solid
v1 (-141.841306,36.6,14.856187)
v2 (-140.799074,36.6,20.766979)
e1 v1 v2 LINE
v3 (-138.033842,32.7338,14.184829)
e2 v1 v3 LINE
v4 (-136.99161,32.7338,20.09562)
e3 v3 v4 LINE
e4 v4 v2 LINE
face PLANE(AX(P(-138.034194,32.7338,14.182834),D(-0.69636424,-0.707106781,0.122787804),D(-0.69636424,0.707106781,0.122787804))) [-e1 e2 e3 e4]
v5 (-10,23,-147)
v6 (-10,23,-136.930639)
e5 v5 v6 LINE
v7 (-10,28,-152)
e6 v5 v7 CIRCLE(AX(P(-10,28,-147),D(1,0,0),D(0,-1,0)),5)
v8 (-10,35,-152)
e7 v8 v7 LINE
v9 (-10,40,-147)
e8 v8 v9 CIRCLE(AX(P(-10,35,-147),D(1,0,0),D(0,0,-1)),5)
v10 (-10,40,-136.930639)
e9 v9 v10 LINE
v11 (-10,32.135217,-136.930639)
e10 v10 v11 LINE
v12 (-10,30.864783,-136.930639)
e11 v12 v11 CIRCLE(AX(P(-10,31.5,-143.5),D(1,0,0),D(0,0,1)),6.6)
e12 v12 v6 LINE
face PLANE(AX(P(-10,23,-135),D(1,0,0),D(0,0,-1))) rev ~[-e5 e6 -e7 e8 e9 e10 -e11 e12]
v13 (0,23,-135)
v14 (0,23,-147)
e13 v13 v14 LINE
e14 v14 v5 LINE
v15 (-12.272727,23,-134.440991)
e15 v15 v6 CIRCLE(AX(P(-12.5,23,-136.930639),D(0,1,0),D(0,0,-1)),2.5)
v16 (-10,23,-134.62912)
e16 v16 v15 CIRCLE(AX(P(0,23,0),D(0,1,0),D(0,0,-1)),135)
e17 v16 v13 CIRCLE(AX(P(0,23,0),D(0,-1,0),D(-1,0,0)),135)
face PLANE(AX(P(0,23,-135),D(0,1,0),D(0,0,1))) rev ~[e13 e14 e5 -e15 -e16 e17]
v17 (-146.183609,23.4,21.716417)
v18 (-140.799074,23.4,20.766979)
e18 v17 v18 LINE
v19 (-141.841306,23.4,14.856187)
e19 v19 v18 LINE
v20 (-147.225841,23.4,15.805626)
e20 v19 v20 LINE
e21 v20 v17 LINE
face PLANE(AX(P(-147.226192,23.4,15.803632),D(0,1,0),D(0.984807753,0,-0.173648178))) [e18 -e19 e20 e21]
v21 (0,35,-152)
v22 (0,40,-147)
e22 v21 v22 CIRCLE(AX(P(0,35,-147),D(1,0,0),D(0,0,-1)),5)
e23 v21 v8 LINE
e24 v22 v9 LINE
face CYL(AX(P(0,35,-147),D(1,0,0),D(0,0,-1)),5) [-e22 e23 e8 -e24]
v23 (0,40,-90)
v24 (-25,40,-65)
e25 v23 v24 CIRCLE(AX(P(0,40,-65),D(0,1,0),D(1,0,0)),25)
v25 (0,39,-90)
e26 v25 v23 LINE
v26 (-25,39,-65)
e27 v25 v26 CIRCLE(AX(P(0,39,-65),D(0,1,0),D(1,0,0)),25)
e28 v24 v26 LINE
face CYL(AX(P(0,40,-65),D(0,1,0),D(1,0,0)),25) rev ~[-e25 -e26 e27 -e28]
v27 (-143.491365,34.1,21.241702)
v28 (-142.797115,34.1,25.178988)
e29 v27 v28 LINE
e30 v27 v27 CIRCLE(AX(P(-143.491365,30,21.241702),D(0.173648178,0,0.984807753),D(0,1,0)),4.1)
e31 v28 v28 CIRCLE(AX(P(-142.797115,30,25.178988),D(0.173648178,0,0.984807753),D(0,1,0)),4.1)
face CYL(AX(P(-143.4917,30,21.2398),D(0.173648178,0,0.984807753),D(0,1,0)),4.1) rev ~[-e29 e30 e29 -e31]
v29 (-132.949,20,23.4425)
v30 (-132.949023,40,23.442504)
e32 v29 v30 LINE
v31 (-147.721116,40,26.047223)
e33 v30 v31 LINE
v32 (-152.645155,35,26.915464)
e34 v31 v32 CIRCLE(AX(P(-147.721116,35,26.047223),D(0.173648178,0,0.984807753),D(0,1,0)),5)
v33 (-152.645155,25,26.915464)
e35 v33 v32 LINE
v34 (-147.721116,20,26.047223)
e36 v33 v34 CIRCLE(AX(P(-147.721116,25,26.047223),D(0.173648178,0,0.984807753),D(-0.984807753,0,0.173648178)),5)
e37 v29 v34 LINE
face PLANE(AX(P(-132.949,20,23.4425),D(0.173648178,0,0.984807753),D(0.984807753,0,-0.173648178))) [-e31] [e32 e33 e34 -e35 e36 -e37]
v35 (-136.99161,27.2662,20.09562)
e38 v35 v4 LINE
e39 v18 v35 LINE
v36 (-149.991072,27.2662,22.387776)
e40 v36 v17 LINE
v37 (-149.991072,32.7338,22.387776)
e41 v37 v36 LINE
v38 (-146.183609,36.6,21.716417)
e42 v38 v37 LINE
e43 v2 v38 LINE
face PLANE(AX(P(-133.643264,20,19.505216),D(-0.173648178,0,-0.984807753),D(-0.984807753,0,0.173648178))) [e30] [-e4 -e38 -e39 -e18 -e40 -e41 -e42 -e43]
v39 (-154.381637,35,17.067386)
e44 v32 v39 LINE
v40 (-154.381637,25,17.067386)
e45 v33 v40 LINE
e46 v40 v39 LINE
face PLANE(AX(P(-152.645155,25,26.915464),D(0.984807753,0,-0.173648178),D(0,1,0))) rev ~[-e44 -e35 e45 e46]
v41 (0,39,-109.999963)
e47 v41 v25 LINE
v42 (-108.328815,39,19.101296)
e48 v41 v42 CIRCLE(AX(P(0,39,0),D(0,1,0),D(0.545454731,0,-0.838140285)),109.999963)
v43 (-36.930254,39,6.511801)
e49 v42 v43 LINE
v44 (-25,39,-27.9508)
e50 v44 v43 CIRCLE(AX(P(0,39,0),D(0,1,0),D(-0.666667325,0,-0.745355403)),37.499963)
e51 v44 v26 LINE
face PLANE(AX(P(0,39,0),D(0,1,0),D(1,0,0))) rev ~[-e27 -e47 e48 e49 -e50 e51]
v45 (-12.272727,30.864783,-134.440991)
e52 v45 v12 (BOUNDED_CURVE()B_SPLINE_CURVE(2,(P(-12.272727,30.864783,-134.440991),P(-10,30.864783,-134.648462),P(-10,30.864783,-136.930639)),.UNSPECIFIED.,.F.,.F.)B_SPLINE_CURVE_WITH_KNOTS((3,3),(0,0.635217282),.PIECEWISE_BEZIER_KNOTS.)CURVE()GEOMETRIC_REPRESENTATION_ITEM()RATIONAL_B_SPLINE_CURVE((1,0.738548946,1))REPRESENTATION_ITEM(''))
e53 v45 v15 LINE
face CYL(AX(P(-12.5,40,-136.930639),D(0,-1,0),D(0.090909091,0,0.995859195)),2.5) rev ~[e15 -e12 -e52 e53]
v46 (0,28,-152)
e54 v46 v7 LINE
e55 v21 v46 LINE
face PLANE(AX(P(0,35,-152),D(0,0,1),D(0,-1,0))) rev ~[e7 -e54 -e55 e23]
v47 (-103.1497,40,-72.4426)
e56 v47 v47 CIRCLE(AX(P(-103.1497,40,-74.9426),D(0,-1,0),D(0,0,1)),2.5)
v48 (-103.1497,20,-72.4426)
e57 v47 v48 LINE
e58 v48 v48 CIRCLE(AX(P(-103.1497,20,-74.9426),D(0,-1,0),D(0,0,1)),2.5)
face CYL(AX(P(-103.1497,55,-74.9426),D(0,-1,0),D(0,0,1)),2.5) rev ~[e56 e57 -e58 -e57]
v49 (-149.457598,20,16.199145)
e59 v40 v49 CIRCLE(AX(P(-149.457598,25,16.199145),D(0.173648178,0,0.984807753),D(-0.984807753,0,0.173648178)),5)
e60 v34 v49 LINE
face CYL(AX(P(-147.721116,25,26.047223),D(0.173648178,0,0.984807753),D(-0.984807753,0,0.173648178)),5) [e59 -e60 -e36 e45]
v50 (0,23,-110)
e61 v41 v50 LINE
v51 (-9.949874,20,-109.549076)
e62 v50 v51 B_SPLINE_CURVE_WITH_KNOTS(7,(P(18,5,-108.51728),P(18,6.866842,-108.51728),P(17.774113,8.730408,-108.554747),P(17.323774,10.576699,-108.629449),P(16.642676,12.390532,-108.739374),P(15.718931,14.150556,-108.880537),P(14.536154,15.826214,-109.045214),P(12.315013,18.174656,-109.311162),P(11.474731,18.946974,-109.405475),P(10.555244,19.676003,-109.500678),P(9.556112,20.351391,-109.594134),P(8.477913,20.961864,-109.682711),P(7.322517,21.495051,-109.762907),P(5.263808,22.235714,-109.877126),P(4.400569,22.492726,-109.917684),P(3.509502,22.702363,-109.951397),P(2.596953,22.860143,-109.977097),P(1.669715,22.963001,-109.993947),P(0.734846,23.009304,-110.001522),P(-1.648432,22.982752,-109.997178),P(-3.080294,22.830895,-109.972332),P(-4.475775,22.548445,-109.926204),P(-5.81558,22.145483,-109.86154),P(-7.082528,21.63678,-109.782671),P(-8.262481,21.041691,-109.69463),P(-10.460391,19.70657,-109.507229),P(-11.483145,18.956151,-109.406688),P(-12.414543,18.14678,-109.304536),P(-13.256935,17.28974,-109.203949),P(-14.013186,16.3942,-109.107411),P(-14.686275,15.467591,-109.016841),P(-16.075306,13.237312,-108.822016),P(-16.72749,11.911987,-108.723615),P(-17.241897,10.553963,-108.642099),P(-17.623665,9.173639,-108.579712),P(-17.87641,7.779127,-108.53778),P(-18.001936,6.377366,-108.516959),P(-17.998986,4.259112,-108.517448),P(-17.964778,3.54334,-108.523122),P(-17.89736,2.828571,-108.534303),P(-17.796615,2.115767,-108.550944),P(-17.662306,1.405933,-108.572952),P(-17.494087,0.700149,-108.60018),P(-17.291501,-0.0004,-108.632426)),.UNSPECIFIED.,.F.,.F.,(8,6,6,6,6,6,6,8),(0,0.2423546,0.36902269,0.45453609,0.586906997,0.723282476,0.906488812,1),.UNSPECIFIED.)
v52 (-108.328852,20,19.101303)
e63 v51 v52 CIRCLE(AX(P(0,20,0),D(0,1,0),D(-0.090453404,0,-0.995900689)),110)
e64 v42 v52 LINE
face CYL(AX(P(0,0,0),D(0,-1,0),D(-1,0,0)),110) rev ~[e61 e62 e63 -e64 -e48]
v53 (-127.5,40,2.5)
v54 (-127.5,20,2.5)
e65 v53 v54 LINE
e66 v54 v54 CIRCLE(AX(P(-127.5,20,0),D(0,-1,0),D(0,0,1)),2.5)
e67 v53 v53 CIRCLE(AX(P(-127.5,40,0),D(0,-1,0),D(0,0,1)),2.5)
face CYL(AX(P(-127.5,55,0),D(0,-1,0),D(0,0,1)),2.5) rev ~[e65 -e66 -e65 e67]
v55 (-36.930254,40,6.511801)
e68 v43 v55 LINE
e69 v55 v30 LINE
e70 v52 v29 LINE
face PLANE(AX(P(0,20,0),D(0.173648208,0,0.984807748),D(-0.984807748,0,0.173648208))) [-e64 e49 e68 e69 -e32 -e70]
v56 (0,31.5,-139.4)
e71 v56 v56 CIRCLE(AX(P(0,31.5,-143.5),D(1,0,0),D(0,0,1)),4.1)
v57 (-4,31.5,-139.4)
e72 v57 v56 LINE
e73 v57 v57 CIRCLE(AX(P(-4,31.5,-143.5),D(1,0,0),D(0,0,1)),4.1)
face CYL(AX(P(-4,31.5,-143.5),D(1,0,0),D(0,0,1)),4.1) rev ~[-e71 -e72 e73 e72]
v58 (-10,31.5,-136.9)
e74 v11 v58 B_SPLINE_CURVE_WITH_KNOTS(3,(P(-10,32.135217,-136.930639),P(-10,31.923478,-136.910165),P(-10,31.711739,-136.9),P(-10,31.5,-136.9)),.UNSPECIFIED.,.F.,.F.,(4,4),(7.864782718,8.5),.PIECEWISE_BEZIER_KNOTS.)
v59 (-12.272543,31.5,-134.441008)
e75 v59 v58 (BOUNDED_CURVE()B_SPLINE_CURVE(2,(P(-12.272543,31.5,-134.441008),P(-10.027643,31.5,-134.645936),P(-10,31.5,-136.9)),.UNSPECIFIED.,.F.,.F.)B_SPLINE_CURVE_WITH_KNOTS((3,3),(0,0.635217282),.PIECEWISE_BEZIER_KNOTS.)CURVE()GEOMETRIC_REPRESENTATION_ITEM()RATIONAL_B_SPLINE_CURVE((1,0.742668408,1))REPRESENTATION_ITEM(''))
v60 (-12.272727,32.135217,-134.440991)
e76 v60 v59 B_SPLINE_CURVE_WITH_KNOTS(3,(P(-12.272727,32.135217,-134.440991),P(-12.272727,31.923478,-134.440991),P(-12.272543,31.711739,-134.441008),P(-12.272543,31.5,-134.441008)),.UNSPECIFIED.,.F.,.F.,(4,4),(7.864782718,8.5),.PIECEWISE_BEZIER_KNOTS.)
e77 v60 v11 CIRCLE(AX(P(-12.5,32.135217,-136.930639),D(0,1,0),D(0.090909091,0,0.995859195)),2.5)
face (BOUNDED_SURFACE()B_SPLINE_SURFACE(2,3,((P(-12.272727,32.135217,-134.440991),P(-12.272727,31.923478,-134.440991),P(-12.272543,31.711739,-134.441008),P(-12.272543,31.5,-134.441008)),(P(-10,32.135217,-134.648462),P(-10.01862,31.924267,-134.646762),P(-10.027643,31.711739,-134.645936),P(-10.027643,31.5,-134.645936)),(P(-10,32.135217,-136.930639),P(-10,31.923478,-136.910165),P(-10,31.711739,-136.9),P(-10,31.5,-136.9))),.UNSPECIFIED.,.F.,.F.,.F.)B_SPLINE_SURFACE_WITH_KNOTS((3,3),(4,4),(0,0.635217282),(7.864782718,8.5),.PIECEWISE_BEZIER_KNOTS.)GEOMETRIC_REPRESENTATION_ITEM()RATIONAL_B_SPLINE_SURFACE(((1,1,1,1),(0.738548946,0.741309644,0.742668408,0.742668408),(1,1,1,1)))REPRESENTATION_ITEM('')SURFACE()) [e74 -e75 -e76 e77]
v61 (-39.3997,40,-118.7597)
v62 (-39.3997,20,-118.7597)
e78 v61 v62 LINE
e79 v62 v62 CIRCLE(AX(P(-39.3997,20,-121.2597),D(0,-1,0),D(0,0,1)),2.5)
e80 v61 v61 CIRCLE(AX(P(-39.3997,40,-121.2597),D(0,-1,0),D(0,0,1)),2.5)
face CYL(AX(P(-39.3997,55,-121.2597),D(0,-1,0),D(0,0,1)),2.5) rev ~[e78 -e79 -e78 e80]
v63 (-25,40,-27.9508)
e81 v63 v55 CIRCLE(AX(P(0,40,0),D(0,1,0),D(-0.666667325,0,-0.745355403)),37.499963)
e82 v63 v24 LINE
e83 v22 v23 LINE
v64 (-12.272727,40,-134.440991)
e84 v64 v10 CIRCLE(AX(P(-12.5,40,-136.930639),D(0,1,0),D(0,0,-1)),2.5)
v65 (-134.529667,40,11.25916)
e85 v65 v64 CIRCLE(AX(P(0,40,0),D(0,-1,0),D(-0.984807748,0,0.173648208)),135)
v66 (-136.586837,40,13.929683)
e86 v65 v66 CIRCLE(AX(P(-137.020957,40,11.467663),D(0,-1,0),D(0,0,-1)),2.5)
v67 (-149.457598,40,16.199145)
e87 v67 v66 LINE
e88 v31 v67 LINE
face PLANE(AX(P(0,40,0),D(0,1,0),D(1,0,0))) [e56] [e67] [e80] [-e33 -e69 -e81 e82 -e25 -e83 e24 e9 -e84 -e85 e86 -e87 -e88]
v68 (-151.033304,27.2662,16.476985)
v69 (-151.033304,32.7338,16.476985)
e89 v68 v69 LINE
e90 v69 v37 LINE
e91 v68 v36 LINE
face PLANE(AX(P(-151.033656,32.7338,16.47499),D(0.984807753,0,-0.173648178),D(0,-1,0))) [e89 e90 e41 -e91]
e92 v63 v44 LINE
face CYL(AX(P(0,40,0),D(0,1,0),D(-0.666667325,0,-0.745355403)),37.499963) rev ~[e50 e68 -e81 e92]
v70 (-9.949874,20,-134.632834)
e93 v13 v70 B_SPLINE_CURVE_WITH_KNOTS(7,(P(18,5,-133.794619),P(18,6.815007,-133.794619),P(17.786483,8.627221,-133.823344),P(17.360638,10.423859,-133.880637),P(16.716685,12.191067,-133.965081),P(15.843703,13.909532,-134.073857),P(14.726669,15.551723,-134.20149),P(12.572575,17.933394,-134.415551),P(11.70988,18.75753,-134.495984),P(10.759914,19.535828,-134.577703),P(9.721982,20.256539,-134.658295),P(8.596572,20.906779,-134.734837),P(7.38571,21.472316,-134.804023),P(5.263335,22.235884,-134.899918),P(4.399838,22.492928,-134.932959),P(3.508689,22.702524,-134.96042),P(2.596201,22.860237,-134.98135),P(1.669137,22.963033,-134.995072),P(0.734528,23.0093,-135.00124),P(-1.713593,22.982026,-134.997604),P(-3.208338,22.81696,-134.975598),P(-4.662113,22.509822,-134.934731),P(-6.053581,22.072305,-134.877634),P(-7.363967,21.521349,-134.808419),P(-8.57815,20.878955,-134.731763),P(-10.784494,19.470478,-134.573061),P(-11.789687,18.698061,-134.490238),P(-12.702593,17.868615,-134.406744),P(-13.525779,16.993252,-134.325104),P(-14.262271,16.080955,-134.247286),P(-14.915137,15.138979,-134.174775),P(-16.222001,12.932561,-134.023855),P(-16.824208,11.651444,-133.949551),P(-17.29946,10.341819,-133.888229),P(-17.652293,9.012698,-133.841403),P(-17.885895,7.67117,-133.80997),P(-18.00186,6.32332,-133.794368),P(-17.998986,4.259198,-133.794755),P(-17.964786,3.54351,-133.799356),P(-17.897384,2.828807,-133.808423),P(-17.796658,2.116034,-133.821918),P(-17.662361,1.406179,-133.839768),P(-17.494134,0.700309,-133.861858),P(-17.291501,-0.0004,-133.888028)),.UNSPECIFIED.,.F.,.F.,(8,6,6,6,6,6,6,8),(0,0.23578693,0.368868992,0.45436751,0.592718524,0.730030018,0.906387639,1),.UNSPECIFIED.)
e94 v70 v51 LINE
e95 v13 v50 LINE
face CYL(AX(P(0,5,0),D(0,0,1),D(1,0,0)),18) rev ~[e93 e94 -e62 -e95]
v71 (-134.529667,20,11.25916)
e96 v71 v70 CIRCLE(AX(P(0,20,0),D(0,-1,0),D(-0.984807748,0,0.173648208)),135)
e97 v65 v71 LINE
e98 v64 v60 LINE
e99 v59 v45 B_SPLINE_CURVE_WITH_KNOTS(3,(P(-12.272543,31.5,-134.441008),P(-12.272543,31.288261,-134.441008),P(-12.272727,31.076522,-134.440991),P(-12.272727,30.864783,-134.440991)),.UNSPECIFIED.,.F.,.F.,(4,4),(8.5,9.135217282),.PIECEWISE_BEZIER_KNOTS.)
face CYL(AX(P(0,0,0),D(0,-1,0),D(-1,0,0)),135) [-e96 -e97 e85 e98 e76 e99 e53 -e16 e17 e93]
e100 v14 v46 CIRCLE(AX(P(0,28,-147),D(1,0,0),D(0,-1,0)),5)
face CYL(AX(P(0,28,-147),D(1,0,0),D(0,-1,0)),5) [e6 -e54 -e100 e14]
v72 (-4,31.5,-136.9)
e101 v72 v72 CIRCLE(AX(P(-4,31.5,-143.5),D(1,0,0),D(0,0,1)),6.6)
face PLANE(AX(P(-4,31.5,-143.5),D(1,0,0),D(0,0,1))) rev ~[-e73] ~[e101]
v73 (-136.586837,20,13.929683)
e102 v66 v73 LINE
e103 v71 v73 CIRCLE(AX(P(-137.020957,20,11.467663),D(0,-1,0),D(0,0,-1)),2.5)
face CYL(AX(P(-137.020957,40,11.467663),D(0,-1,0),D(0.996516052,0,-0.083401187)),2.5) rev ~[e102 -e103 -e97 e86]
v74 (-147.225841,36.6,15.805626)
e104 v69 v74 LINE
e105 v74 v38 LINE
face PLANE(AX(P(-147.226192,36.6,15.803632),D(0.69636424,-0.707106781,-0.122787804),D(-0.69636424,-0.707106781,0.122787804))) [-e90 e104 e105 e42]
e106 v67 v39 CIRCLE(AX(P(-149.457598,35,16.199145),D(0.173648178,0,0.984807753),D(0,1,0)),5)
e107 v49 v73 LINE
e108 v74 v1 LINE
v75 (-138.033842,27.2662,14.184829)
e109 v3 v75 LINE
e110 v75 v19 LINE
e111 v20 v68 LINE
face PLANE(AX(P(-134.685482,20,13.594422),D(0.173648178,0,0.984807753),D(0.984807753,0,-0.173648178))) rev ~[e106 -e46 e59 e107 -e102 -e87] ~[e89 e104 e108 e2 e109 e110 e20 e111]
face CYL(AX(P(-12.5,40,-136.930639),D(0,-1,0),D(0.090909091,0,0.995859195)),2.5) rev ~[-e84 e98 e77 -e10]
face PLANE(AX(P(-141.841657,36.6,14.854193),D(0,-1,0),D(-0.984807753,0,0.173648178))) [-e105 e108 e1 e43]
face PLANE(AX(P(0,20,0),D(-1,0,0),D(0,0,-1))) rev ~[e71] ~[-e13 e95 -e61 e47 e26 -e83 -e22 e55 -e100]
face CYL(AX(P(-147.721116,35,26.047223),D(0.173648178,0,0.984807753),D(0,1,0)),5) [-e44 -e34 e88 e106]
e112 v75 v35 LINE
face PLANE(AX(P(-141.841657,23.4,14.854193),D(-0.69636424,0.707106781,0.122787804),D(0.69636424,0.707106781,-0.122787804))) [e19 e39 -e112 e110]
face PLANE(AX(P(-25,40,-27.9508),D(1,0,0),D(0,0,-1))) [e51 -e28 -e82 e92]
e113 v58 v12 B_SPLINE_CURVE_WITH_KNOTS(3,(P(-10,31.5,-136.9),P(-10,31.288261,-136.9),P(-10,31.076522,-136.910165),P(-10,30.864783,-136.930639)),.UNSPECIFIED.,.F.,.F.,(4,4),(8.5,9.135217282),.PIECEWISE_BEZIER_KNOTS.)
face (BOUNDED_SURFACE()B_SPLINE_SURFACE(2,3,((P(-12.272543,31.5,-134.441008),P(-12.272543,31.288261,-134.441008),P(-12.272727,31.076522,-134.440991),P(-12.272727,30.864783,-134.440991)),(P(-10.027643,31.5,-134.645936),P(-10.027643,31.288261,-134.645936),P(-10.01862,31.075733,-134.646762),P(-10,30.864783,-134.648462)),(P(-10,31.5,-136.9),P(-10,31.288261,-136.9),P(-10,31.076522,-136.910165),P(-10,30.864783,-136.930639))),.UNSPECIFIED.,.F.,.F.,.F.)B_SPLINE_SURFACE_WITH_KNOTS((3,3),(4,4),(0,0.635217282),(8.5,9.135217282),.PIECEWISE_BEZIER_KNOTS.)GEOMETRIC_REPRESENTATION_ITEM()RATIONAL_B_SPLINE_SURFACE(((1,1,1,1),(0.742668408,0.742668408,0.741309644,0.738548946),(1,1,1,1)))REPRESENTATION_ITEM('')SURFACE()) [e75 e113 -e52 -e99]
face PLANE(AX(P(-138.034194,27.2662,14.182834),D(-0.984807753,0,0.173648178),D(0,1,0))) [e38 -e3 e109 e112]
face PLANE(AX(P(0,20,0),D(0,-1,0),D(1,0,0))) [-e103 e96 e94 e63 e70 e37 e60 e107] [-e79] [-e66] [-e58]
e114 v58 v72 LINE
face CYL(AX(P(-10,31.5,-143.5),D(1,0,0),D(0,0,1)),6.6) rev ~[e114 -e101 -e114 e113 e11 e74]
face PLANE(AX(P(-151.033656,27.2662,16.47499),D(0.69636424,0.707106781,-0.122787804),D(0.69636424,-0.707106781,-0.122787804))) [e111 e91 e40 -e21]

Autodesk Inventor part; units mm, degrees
ref_plane "YZ Plane" through (0, 0, 0) normal (1, 0, 0) x (0, 1, 0)
ref_plane "XZ Plane" through (0, 0, 0) normal (0, 1, 0) x (-1, 0, 0)
ref_plane "XY Plane" through (0, 0, 0) normal (0, 0, 1) x (1, 0, 0)
sketch "Sketch1" plane through (0, 0, 0) normal (0, 1, 0) x (-1, 0, 0)
  circle A0 centre (0, 0) radius 135
  circle A1 centre (0, 0) radius 110
  dimension "d0" = 270
  dimension "d1" = 220
extrude "Extrusion1" add sketch "Sketch1" along normal blind 55
sketch "Sketch2" plane through (0, 0, 0) normal (0, 0, 1) x (1, 0, 0)
  circle A0 centre (0, 5) radius 18
  line L0 (135, 0) -> (-135, 0) projected
  point P0 (0, 0)
  dimension "d4" = 36
  dimension "d5" = 5
extrude "Extrusion2" cut sketch "Sketch2" against normal through all
sketch "Sketch3" plane through (0, 0, 0) normal (0, -1, 0) x (1, 0, 0)
  circle A0 centre (0, 0) radius 140
extrude "Extrusion3" cut sketch "Sketch3" against normal blind 20
sketch "Sketch4" plane through (0, 20, 0) normal (0, -1, 0) x (1, 0, 0)
  line L0 (0, 0) -> (70, 0)
  line L1 (80, -100) -> (60, -100)
  line L2 (60, -100) -> (60, 100)
  line L3 (60, 100) -> (80, 100)
  line L4 (80, 100) -> (80, -100)
  line L5 (80, -100) -> (60, 100) construction
  line L6 (60, -100) -> (80, 100) construction
  dimension "d10" = 70
  dimension "d11" = 20
  dimension "d12" = 200
extrude "Extrusion4" cut sketch "Sketch4" against normal through all
sketch "Sketch5" plane through (0, 55, 0) normal (0, 1, 0) x (1, 0, 0)
  circle A0 centre (0, 0) radius 127.5
  circle A1 centre (127.5, 0) radius 2
  circle A2 centre (103.1497, 74.9426) radius 2
  circle A3 centre (39.3997, 121.2597) radius 2
  circle A4 centre (-39.3997, 121.2597) radius 2
  circle A5 centre (-103.1497, 74.9426) radius 2
  circle A6 centre (-127.5, 0) radius 2
  circle A7 centre (-103.1497, -74.9426) radius 2
  circle A8 centre (-39.3997, -121.2597) radius 2
  circle A9 centre (39.3997, -121.2597) radius 2
  circle A10 centre (103.1497, -74.9426) radius 2
  dimension "d15" = 255
  dimension "d16" = 4
  dimension "d19" = 360
hole "Hole1" at (127.5, 55, 0) at (103.1497, 55, 74.9426) at (39.3997, 55, 121.2597) at (-39.3997, 55, 121.2597) at (-103.1497, 55, 74.9426) at (-127.5, 55, 0) at (-103.1497, 55, -74.9426) at (-39.3997, 55, -121.2597) at (39.3997, 55, -121.2597) at (103.1497, 55, -74.9426) direction (0, -1, 0) diameter 5 end through all
sketch "Sketch6" plane through (0, 55, 0) normal (0, 1, 0) x (1, 0, 0)
  circle A0 centre (0, 0) radius 140
extrude "Extrusion5" cut sketch "Sketch6" against normal blind 15
sketch "Sketch7" plane through (0, 40, 0) normal (0, 1, 0) x (1, 0, 0)
  circle A0 centre (0, 0) radius 140
  line L0 (80, -100) -> (80, -75.4983) projected
  line L1 (80, -100) -> (80, -75.4983)
  line L2 (60, -100) -> (80, -100) projected
  line L3 (80, -100) -> (60, -100)
  line L4 (60, -100) -> (60, -92.1954)
  line L5 (60, 100) -> (60, 92.1954) projected
  line L6 (60, 92.1954) -> (60, 100)
  line L7 (60, 100) -> (80, 100)
  line L8 (80, 100) -> (80, 75.4983)
  arc A1 (80, -75.4983) -> (80, 75.4983) centre (0, 0) ccw
  arc A2 (60, 92.1954) -> (60, -92.1954) centre (0, 0) ccw
  arc A3 (-25, -65) -> (25, -65) centre (0, -65) ccw
  arc A4 (25, 65) -> (-25, 65) centre (0, 65) ccw
  arc A5 (25, -27.9508) -> (25, 27.9508) centre (0, 0) ccw
  arc A6 (-25, 27.9508) -> (-25, -27.9508) centre (0, 0) ccw
  line L9 (25, 65) -> (25, 27.9508)
  line L10 (25, -27.9508) -> (25, -65)
  line L11 (-25, -65) -> (-25, -27.9508)
  line L12 (-25, 27.9508) -> (-25, 65)
extrude "Extrusion6" add sketch "Sketch7" against normal blind 1 contours L2 L4 A2 L5 L7 L8 A1 L0
sketch "Sketch8" plane through (0, 39, 0) normal (0, -1, 0) x (1, 0, 0)
  line L0 (80, -75.4983) -> (80, -100) projected
  line L1 (80, -100) -> (60, -100)
  line L2 (60, -100) -> (60, 100)
  line L3 (60, 100) -> (80, 100)
  line L4 (80, 100) -> (80, 75.4983)
  line L5 (80, -75.4983) -> (80, -100)
  arc A0 (80, -75.4983) -> (80, 75.4983) centre (0, 0) ccw
  arc A1 (60, 92.1954) -> (60, -92.1954) centre (0, 0) ccw
extrude "Extrusion7" add sketch "Sketch8" along normal blind 14 contours L0 L1 L2 L3 L4 A0
sketch "Sketch9" plane through (0, 20, 0) normal (0, -1, 0) x (1, 0, 0)
  arc A0 (9.9499, -134.6328) -> (-9.9499, -134.6328) centre (0, 0) ccw projected
  spline S0 degree 7 poles (9.9499, -134.6328) (9.4556, -134.6694) (8.9421, -134.7052) (8.4096, -134.74) (7.8582, -134.7735) (7.2882, -134.8052) (6.6998, -134.835) (5.2633, -134.8999) (4.3998, -134.933) (3.5087, -134.9604) (2.5962, -134.9814) (1.6691, -134.9951) (0.7345, -135.0012) (-1.7136, -134.9976) (-3.2083, -134.9756) (-4.6621, -134.9347) (-6.0536, -134.8776) (-7.364, -134.8084) (-8.5782, -134.7318) (-9.7236, -134.6494) (-9.7616, -134.6466) (-9.7995, -134.6439) (-9.8372, -134.6411) (-9.8749, -134.6384) (-9.9124, -134.6356) (-9.9499, -134.6328) knots 0 0 0 0 0 0 0 0 0.214533 0.214533 0.214533 0.214533 0.214533 0.214533 0.508291 0.508291 0.508291 0.508291 0.508291 0.508291 0.983641 0.983641 0.983641 0.983641 0.983641 0.983641 1 1 1 1 1 1 1 1 projected
  line L0 (0, 135) -> (0, -135)
  line L1 (132.949, -23.4425) -> (-132.949, 23.4425)
  point P0 (0, 0)
  dimension "d40" = 80
extrude "Extrusion8" cut sketch "Sketch9" against normal through all contours S0 L0 L1 A0 | L1 L0 A0 | L0 L1 A0 picked at (74.3823, -50.3789)
sketch "Sketch10" plane through (0, 23, -135) normal (1, 0, 0) x (0, 0, -1)
  line L0 (-45, 17) -> (0, 17) projected
  line L1 (-2.5, 17) -> (12, 17)
  line L2 (17, 12) -> (17, 5)
  line L3 (12, 0) -> (-2.5, 0)
  line L4 (-2.5, 0) -> (-2.5, 17)
  line L5 (0, 17) -> (0, 0) projected
  arc A0 (17, 12) -> (12, 17) centre (12, 12) ccw
  arc A1 (12, 0) -> (17, 5) centre (12, 5) ccw
  point P0 (-135, -23)
  point P1 (17, 0)
  point P2 (17, 17)
  dimension "d43" = 19.5
  dimension "d44" = 17
  dimension "d45" = 17
  dimension "d46" = 5
extrude "Extrusion9" add sketch "Sketch10" against normal blind 10
sketch "Sketch11" plane through (-10, 23, -135) normal (-1, 0, 0) x (0, 0, 1)
  line L0 (0.3709, 17) -> (-12, 17) projected
  line L1 (-17, 12) -> (-17, 5) projected
  point P0 (135, -23)
  point P1 (-8.5, 8.5)
  dimension "d49" = 8.5
  dimension "d50" = 8.5
hole "Hole2" at (-10, 31.5, -143.5) direction (1, 0, 0) diameter 8.2 end through all counterbore diameter 13.2 counterbore depth 6
sketch "Sketch12" plane through (-132.949, 20, 23.4425) normal (0.1736482, 0, 0.9848078) x (0.9848078, 0, -0.1736482)
  line L0 (25, 0) -> (0, 0) projected
  line L1 (2.5, 0) -> (-15, 0)
  line L2 (-20, 5) -> (-20, 15)
  line L3 (-15, 20) -> (2.5, 20)
  line L4 (2.5, 20) -> (2.5, 0)
  line L5 (0, 0) -> (0, 20) projected
  arc A0 (-15, 20) -> (-20, 15) centre (-15, 15) ccw
  arc A1 (-20, 5) -> (-15, 0) centre (-15, 5) ccw
  point P0 (135, -20)
  point P1 (-20, 20)
  point P2 (-20, 0)
  dimension "d59" = 22.5
  dimension "d60" = 20
  dimension "d61" = 20
  dimension "d62" = 5
extrude "Extrusion10" add sketch "Sketch12" against normal blind 10
sketch "Sketch13" plane through (-134.6855, 20, 13.5944) normal (-0.1736482, 0, -0.9848078) x (-0.9848078, 0, 0.1736482)
  line L0 (7.2662, 16.6) -> (12.7338, 16.6)
  line L1 (12.7338, 16.6) -> (16.6, 12.7338)
  line L2 (16.6, 12.7338) -> (16.6, 7.2662)
  line L3 (16.6, 7.2662) -> (12.7338, 3.4)
  line L4 (12.7338, 3.4) -> (7.2662, 3.4)
  line L5 (7.2662, 3.4) -> (3.4, 7.2662)
  line L6 (3.4, 7.2662) -> (3.4, 12.7338)
  line L7 (3.4, 12.7338) -> (7.2662, 16.6)
  line L8 (20, 5) -> (20, 15) projected
  line L9 (15, 20) -> (-0.3709, 20) projected
  point P0 (-135, -20)
  point P1 (10, 10)
  dimension "d65" = 10
  dimension "d66" = 10
  dimension "d67" = 13.2
extrude "Extrusion11" cut sketch "Sketch13" against normal blind 6
sketch "Sketch14" plane through (-133.6436, 20, 19.5033) normal (-0.1736482, 0, -0.9848078) x (-0.9848078, 0, 0.1736482)
  line L0 (20, 5) -> (20, 15) projected
  line L1 (15, 20) -> (-0.3709, 20) projected
  point P0 (-135, -20)
  point P1 (10, 10)
  dimension "d70" = 10
  dimension "d71" = 10
hole "Hole3" at (-143.4917, 30, 21.2398) direction (0.1736482, 0, 0.9848078) diameter 8.2 end through all
fillet "Fillet2" radius 2.5 2 edges at (-10, 31.5, -134.6291) (-134.3203, 30, 13.53)
properties part number "Cylinder Spacer Top_Q"
